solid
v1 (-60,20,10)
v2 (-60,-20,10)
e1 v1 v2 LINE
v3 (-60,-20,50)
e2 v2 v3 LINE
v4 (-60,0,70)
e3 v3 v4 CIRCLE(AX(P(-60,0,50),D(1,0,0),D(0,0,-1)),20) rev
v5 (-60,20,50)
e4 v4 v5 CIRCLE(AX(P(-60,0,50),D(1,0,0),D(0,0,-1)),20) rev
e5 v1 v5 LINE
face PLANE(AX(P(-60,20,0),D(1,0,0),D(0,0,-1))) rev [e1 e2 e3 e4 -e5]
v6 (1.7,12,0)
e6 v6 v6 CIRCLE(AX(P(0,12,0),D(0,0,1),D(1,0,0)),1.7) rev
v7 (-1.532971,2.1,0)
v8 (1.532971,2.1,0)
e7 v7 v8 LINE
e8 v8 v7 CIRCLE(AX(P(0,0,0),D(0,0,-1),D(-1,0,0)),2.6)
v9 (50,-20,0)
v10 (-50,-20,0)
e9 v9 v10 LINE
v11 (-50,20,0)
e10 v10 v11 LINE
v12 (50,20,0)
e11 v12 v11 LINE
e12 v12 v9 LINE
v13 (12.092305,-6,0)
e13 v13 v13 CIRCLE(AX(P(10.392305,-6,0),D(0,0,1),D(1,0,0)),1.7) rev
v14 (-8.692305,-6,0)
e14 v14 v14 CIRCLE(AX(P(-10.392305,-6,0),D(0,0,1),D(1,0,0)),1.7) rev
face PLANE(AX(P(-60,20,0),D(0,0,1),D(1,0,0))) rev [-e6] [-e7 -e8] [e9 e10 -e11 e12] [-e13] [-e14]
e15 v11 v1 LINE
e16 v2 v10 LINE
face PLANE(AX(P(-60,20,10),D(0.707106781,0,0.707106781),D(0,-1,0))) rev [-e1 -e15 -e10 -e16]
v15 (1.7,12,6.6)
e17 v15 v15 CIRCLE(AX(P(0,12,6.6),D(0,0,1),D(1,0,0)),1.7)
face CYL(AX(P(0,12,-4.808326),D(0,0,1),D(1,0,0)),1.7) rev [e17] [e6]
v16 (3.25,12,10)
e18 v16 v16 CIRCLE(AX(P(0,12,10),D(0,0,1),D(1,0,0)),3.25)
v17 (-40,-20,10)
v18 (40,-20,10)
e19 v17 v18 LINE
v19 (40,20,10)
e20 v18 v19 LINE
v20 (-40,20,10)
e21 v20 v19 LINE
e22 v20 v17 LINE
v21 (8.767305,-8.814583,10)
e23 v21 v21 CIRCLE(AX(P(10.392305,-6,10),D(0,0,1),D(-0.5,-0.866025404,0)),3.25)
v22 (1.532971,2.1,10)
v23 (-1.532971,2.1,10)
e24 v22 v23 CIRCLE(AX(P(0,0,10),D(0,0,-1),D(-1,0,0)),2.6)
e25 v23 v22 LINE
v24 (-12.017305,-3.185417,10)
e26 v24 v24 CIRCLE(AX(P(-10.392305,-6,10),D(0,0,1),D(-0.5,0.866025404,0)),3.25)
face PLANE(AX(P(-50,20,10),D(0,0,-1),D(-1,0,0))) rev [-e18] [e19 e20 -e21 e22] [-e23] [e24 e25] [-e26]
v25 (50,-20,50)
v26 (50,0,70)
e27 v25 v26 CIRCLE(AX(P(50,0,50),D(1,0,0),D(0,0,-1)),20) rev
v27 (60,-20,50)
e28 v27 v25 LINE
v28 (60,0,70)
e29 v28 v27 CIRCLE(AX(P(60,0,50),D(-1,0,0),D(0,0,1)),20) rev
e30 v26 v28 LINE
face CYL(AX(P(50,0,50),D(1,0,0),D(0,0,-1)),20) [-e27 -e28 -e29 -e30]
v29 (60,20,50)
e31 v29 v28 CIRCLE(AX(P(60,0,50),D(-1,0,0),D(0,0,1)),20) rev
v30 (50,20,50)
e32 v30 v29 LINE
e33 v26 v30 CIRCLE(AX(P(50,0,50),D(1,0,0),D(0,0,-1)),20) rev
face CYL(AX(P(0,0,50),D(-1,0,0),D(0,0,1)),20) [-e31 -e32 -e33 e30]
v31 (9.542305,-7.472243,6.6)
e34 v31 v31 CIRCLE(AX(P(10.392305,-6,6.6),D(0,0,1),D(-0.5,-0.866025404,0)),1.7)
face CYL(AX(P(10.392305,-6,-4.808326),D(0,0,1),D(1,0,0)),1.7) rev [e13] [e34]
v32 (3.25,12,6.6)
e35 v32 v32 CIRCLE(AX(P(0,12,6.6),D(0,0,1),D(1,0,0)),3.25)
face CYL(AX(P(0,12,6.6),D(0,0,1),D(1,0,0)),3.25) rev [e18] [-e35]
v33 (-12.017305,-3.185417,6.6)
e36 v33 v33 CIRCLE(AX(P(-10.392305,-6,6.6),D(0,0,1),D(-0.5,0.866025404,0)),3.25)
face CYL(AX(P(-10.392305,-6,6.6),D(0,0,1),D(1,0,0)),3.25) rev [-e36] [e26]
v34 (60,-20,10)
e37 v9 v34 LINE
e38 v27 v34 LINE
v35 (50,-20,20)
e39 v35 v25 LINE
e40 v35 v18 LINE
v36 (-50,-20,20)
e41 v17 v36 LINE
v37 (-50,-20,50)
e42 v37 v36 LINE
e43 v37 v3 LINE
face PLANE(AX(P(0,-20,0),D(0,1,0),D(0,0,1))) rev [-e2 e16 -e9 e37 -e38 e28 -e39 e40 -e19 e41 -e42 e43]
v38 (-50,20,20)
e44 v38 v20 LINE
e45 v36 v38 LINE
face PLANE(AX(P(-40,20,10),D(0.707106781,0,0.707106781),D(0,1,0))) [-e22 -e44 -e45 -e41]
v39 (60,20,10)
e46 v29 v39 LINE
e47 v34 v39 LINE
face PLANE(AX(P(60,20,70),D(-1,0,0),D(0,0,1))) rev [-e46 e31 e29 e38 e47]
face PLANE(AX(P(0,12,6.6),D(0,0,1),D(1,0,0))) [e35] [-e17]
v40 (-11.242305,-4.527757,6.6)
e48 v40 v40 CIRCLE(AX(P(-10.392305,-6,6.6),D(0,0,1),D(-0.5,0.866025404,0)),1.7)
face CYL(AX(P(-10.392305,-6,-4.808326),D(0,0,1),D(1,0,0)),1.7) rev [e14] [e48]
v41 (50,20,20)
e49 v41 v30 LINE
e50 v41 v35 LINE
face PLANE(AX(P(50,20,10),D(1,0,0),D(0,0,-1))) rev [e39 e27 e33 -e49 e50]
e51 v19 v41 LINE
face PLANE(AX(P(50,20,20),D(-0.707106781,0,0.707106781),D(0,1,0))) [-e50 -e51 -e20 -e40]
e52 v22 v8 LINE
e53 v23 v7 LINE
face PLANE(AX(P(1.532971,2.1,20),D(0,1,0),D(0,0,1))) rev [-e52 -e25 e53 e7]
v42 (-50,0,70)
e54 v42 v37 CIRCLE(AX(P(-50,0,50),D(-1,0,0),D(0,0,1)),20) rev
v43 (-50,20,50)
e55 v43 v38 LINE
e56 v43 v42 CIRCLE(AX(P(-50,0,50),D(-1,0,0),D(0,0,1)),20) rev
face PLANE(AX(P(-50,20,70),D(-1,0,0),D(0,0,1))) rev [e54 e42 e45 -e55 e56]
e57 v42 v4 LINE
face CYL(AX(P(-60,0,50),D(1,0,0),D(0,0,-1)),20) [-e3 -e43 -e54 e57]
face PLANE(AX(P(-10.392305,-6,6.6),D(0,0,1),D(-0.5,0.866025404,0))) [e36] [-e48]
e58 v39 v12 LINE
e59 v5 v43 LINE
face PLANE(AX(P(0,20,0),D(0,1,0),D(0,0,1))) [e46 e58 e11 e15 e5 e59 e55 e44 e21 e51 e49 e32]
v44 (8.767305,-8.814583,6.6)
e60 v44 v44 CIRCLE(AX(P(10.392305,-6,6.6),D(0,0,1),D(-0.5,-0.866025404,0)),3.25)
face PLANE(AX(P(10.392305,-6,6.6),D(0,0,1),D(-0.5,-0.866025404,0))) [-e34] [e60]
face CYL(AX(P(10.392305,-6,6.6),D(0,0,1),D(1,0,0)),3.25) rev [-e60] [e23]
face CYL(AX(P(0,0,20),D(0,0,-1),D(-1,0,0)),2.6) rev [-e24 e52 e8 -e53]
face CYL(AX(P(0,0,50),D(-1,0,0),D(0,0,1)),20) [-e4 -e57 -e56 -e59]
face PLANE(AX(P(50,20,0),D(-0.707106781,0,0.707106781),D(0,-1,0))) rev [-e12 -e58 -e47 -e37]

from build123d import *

# Parameters (mm, degrees)
AUFSATZ_LINEAR_AUSTRAGEN1_DEPTH = 20
SCHNITT_LINEAR_AUSTRAGEN1_DEPTH = 20
FASE1_SIZE                      = 10
VERRUNDUNG1_R                   = 20
SKIZZE3_R                       = 3.25
SCHNITT_LINEAR_AUSTRAGEN2_DEPTH = 3.4
SKIZZE4_R                       = 1.7
SCHNITT_LINEAR_AUSTRAGEN3_DEPTH = 6.6
KREISMUSTER1_COUNT              = 3


with BuildPart() as part:
    # Skizze1 → Aufsatz-Linear austragen1 (new, symmetric)
    with BuildSketch(Plane(origin=(0, 0, 0), x_dir=(1, 0, 0), z_dir=(0, 1, 0))):
        Polygon((-60, 0), (60, 0), (60, -70), (50, -70), (50, -10), (-50, -10), (-50, -70), (-60, -70), align=None)
    extrude(amount=AUFSATZ_LINEAR_AUSTRAGEN1_DEPTH, both=True)

    # Skizze2 → Schnitt-Linear austragen1 (cut)
    with BuildSketch(Plane(origin=(0, 0, 0), x_dir=(-1, 0, 0), z_dir=(0, 0, -1))):
        with BuildLine():
            Line((-1.532970972, 2.1), (1.532970972, 2.1))
            ThreePointArc((1.532970972, 2.1), (0, -2.6), (-1.532970972, 2.1))
        make_face()
    extrude(amount=-SCHNITT_LINEAR_AUSTRAGEN1_DEPTH, mode=Mode.SUBTRACT)

    # Fase1
    fase1_edges = [part.edges().sort_by_distance(p)[0] for p in [
        (-60, 0, 0),
        (60, 0, 0),
        (50, 0, 10),
        (-50, 0, 10),
    ]]
    chamfer(fase1_edges, length=FASE1_SIZE)

    # Verrundung1
    verrundung1_edges = [part.edges().sort_by_distance(p)[0] for p in [
        (-55, -20, 70),
        (-55, 20, 70),
        (55, 20, 70),
        (55, -20, 70),
    ]]
    fillet(verrundung1_edges, radius=VERRUNDUNG1_R - 0.0001)  # a hair under: the kernel refuses the full size

    # Skizze3 → Schnitt-Linear austragen2 (cut)
    with BuildSketch(Plane.XY.offset(10)):
        with Locations((0, 12)):
            Circle(SKIZZE3_R)
    schnitt_linear_austragen2 = extrude(amount=-SCHNITT_LINEAR_AUSTRAGEN2_DEPTH, mode=Mode.SUBTRACT)

    # Skizze4 → Schnitt-Linear austragen3 (cut)
    with BuildSketch(Plane.XY.offset(6.6)):
        with Locations((0, 12)):
            Circle(SKIZZE4_R)
    schnitt_linear_austragen3 = extrude(amount=-SCHNITT_LINEAR_AUSTRAGEN3_DEPTH, mode=Mode.SUBTRACT)

    # Kreismuster1: Schnitt-Linear austragen2, Schnitt-Linear austragen3 ×3 about axis
    kreismuster1_axis = Axis((0, 0, 0), (0, 0, 1))
    add([schnitt_linear_austragen2.rotate(kreismuster1_axis, i * 360 / KREISMUSTER1_COUNT) for i in range(1, KREISMUSTER1_COUNT)], mode=Mode.SUBTRACT)
    add([schnitt_linear_austragen3.rotate(kreismuster1_axis, i * 360 / KREISMUSTER1_COUNT) for i in range(1, KREISMUSTER1_COUNT)], mode=Mode.SUBTRACT)


solid = part.part
